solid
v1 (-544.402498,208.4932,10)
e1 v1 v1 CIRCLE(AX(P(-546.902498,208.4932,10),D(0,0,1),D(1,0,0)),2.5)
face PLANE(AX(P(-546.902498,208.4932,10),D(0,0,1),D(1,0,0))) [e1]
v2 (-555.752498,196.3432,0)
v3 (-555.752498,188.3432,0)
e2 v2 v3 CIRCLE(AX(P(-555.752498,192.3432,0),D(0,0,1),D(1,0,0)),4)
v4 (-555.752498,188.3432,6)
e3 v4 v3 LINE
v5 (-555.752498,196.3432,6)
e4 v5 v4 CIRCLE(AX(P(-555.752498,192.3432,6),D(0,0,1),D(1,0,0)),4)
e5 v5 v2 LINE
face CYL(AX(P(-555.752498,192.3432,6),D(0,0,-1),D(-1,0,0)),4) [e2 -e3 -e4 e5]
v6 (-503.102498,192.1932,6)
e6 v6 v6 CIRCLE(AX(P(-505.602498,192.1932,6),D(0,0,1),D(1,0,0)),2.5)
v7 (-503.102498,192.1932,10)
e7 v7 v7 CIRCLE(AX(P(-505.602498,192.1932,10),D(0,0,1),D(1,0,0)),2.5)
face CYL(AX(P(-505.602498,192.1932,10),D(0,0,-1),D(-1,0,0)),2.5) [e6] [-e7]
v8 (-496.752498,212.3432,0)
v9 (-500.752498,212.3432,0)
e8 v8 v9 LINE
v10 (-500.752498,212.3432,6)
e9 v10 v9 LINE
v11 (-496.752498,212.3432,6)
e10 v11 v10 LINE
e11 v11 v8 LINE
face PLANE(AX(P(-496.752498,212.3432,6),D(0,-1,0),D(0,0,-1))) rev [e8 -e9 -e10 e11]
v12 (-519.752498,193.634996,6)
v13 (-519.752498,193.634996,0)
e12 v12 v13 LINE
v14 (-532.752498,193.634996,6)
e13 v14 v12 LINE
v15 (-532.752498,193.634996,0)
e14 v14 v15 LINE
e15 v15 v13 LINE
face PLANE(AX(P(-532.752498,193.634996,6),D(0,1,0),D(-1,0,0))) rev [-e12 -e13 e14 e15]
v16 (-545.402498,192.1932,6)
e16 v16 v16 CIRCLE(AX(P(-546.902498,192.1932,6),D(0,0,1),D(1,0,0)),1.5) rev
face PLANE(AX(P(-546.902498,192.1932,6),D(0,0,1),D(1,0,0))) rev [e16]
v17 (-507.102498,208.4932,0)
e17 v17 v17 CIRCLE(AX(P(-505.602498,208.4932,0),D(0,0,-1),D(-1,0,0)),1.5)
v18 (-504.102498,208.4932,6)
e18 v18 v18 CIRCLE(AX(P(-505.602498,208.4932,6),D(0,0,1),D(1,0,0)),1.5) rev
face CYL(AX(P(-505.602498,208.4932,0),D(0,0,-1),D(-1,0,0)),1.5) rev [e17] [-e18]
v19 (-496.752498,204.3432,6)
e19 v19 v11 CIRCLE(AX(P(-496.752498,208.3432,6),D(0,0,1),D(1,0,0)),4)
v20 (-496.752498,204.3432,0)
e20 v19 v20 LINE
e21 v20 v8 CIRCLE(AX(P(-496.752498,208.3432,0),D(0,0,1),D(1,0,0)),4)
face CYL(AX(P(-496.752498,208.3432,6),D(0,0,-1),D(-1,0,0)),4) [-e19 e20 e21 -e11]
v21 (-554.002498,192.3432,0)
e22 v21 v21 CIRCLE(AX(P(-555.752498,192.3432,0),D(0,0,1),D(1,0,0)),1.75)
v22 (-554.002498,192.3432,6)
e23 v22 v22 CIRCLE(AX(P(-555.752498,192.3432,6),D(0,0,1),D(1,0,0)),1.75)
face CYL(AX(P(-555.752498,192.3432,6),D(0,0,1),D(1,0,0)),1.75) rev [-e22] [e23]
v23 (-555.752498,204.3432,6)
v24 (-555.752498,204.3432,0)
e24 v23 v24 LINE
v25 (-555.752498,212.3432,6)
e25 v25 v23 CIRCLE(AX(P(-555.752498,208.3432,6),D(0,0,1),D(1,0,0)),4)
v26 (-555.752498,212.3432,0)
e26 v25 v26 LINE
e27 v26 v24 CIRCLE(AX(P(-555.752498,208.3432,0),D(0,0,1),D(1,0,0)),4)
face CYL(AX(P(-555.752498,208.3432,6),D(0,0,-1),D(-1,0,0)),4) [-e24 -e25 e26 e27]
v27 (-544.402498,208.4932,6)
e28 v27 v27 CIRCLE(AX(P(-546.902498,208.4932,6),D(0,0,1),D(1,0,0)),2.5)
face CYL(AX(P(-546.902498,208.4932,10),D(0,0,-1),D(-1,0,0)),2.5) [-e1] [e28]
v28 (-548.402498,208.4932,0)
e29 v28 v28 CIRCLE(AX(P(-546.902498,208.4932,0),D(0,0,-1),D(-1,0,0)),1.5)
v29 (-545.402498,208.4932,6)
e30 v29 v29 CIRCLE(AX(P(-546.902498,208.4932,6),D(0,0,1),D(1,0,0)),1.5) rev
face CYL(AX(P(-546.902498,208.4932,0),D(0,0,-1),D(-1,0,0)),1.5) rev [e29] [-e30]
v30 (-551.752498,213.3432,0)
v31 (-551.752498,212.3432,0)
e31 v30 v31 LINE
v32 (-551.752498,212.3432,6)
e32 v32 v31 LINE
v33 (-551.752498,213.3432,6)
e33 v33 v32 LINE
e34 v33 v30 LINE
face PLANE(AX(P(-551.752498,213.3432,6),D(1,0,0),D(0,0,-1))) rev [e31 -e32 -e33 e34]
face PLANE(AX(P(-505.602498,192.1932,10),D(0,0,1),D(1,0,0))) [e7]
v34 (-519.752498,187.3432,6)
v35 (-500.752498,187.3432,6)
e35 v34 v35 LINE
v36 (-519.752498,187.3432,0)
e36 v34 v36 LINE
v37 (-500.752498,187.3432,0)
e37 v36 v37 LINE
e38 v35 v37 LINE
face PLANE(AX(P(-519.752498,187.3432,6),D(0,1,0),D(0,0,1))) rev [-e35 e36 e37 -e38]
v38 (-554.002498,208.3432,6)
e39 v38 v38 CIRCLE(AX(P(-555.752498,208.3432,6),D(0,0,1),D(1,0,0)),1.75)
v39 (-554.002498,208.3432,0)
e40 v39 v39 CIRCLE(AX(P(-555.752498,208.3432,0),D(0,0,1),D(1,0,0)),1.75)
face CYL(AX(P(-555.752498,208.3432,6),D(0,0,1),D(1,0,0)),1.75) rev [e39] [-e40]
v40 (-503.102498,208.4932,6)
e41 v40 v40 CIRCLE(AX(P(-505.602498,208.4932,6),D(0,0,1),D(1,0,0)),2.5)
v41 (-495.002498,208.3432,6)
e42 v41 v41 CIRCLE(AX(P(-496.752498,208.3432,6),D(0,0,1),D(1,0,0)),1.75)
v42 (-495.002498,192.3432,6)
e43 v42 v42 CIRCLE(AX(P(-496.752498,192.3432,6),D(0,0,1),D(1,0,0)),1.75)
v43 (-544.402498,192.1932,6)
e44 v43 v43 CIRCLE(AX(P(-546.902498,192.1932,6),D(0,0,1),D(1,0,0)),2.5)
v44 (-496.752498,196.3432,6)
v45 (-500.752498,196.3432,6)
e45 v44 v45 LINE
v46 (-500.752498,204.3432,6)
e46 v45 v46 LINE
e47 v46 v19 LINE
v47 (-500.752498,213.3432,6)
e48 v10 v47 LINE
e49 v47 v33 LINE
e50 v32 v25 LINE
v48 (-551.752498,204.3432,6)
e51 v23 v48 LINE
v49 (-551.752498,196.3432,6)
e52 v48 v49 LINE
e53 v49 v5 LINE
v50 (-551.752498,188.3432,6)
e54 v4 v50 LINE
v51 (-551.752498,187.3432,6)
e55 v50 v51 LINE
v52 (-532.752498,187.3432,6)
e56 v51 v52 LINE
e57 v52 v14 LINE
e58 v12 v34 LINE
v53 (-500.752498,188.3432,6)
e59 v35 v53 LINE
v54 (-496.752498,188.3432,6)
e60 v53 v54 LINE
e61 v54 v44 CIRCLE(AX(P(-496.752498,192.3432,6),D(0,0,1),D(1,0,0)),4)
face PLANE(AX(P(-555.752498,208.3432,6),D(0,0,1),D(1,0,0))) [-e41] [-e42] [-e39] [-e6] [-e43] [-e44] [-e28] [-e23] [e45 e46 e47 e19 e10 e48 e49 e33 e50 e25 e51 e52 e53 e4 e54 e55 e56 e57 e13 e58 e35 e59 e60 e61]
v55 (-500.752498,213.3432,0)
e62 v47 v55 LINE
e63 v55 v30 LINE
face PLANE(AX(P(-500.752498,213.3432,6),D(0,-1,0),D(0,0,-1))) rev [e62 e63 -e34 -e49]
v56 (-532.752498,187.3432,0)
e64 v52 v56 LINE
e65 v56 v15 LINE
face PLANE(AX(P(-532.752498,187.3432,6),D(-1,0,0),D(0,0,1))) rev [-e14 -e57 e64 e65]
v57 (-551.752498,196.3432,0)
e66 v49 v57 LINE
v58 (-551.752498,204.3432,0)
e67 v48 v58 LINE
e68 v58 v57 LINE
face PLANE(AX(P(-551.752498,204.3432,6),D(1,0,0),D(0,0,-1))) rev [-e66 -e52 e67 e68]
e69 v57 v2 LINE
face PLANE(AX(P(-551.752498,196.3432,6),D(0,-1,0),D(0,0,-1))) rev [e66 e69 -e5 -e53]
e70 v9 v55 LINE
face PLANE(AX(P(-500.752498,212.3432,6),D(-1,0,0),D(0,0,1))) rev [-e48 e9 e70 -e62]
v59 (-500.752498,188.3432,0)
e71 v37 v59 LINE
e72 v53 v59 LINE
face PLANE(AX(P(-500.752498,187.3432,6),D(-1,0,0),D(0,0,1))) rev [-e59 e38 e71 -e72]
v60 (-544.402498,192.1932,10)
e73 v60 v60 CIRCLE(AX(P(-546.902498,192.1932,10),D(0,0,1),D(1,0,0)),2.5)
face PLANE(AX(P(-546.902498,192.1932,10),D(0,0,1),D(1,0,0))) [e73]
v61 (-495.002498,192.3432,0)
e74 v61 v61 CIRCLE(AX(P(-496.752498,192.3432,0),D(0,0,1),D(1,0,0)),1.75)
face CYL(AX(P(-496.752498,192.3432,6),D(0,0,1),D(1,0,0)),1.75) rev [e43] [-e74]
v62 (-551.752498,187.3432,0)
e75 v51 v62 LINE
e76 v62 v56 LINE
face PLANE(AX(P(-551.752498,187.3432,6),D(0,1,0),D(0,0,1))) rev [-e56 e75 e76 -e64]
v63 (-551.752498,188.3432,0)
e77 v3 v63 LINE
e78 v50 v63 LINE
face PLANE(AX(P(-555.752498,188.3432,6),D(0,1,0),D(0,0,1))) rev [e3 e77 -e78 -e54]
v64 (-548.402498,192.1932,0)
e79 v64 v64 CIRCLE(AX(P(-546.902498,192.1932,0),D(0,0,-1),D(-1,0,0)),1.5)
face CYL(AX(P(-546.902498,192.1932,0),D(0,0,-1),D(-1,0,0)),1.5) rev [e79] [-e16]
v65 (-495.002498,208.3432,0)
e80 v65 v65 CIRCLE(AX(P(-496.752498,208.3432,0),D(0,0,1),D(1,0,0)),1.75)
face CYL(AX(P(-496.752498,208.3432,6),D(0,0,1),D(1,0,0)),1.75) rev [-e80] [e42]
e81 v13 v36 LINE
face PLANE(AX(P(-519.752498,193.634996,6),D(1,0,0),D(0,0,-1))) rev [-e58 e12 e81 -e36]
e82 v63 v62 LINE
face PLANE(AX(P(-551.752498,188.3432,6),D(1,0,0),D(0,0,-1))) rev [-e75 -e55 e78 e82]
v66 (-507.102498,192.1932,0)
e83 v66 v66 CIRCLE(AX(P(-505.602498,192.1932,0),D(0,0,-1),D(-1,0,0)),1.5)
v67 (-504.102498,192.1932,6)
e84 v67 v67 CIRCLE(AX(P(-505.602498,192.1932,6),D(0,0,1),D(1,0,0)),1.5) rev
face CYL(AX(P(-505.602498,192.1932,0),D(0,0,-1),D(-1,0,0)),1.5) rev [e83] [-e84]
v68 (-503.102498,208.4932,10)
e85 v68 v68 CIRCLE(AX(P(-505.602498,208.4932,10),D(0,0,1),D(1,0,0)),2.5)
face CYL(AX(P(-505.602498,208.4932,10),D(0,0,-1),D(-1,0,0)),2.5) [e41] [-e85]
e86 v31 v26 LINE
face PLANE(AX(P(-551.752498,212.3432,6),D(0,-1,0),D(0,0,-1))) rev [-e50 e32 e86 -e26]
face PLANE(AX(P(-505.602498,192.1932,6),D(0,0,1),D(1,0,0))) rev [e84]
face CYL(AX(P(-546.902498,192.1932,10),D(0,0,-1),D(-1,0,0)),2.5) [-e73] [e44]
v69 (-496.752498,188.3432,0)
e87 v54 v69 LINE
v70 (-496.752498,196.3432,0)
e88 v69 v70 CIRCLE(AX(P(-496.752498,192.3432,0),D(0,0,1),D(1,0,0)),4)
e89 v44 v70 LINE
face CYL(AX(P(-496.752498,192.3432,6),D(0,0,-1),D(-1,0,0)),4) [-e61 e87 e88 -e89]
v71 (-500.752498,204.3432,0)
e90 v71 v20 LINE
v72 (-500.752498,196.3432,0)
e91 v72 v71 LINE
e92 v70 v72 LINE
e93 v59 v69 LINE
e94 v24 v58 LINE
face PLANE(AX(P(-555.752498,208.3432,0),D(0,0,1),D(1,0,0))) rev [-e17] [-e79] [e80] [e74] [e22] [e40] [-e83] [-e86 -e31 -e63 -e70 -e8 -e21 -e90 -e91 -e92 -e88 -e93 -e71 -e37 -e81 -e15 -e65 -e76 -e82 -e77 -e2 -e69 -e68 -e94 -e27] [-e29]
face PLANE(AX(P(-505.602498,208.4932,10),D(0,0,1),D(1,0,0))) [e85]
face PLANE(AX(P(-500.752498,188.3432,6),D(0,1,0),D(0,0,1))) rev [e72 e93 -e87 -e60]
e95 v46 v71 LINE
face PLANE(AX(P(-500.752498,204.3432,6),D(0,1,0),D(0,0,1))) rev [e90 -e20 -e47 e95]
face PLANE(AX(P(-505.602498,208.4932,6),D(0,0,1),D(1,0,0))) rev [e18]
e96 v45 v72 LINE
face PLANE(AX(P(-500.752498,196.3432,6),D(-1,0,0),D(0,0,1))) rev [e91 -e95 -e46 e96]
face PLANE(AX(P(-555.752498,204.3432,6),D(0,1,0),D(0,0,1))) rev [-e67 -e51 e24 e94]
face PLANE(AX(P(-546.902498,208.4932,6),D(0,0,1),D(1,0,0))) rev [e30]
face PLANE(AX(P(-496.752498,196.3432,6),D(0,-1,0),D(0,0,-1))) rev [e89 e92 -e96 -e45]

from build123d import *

# Parameters (mm, degrees)
AUFSATZ_LINEAR_AUSTRAGEN1_DEPTH        = 6
F_3_5_3_5_DURCHMESSER_BOHRUNG1_D       = 3.5
F_3_0_3_DURCHMESSER_BOHRUNG2_OUTLINE_R = 1.5
F_3_0_3_DURCHMESSER_BOHRUNG2_DEPTH     = 6
SKIZZE10_R                             = 2.5
AUFSATZ_LINEAR_AUSTRAGEN2_DEPTH        = 4


# Read off the part's stored shape, not the designer's step: Ø3.0 (3) Durchmesser Bohrung2
with BuildPart() as part:
    # Skizze1 → Aufsatz-Linear austragen1 (new body)
    with BuildSketch(Plane.XY):
        with BuildLine():
            Line((-551.752498469, 213.343199998), (-551.752498469, 212.343199998))
            Line((-551.752498469, 212.343199998), (-555.752498469, 212.343199998))
            ThreePointArc((-555.752498469, 212.343199998), (-559.752498469, 208.343199998), (-555.752498469, 204.343199998))
            Line((-555.752498469, 204.343199998), (-551.752498469, 204.343199998))
            Line((-551.752498469, 204.343199998), (-551.752498469, 196.343199998))
            Line((-551.752498469, 196.343199998), (-555.752498469, 196.343199998))
            ThreePointArc((-555.752498469, 196.343199998), (-559.752498469, 192.343199998), (-555.752498469, 188.343199998))
            Line((-555.752498469, 188.343199998), (-551.752498469, 188.343199998))
            Line((-551.752498469, 188.343199998), (-551.752498469, 187.343199998))
            Line((-551.752498469, 187.343199998), (-532.752498469, 187.343199998))
            Line((-532.752498469, 187.343199998), (-532.752498469, 193.634996066))
            Line((-532.752498469, 193.634996066), (-519.752498469, 193.634996066))
            Line((-519.752498469, 193.634996066), (-519.752498469, 187.343199998))
            Line((-519.752498469, 187.343199998), (-500.752498469, 187.343199998))
            Line((-500.752498469, 187.343199998), (-500.752498469, 188.343199998))
            Line((-500.752498469, 188.343199998), (-496.752498469, 188.343199998))
            ThreePointArc((-496.752498469, 188.343199998), (-492.752498469, 192.343199998), (-496.752498469, 196.343199998))
            Line((-496.752498469, 196.343199998), (-500.752498469, 196.343199998))
            Line((-500.752498469, 196.343199998), (-500.752498469, 204.343199998))
            Line((-500.752498469, 204.343199998), (-496.752498469, 204.343199998))
            ThreePointArc((-496.752498469, 204.343199998), (-492.752498469, 208.343199998), (-496.752498469, 212.343199998))
            Line((-496.752498469, 212.343199998), (-500.752498469, 212.343199998))
            Line((-500.752498469, 212.343199998), (-500.752498469, 213.343199998))
            Line((-500.752498469, 213.343199998), (-551.752498469, 213.343199998))
        make_face()
    extrude(amount=AUFSATZ_LINEAR_AUSTRAGEN1_DEPTH)

    # Ø3.5 (3.5) Durchmesser Bohrung1 (through all)
    with Locations(Plane.XY.offset(6)):
        with Locations((-555.752498469, 208.343199998), (-555.752498469, 192.343199998), (-496.752498469, 192.343199998), (-496.752498469, 208.343199998)):
            Hole(F_3_5_3_5_DURCHMESSER_BOHRUNG1_D / 2)

    # Ø3.0 (3) Durchmesser Bohrung2 outline → Ø3.0 (3) Durchmesser Bohrung2 (cut)
    with BuildSketch(Plane.XY):
        with Locations((-546.902498469, 208.493199998)):
            Circle(F_3_0_3_DURCHMESSER_BOHRUNG2_OUTLINE_R)
        with Locations((-505.602498469, 192.193199998)):
            Circle(F_3_0_3_DURCHMESSER_BOHRUNG2_OUTLINE_R)
        with Locations((-546.902498469, 192.193199998)):
            Circle(F_3_0_3_DURCHMESSER_BOHRUNG2_OUTLINE_R)
        with Locations((-505.602498469, 208.493199998)):
            Circle(F_3_0_3_DURCHMESSER_BOHRUNG2_OUTLINE_R)
    extrude(amount=F_3_0_3_DURCHMESSER_BOHRUNG2_DEPTH, mode=Mode.SUBTRACT)

    # Skizze10 → Aufsatz-Linear austragen2 (add)
    with BuildSketch(Plane.XY.offset(6)):
        with Locations((-546.902498469, 208.493199998)):
            Circle(SKIZZE10_R)
        with Locations((-546.902498469, 192.193199998)):
            Circle(SKIZZE10_R)
        with Locations((-505.602498469, 208.493199998)):
            Circle(SKIZZE10_R)
        with Locations((-505.602498469, 192.193199998)):
            Circle(SKIZZE10_R)
    extrude(amount=AUFSATZ_LINEAR_AUSTRAGEN2_DEPTH)


solid = part.part
